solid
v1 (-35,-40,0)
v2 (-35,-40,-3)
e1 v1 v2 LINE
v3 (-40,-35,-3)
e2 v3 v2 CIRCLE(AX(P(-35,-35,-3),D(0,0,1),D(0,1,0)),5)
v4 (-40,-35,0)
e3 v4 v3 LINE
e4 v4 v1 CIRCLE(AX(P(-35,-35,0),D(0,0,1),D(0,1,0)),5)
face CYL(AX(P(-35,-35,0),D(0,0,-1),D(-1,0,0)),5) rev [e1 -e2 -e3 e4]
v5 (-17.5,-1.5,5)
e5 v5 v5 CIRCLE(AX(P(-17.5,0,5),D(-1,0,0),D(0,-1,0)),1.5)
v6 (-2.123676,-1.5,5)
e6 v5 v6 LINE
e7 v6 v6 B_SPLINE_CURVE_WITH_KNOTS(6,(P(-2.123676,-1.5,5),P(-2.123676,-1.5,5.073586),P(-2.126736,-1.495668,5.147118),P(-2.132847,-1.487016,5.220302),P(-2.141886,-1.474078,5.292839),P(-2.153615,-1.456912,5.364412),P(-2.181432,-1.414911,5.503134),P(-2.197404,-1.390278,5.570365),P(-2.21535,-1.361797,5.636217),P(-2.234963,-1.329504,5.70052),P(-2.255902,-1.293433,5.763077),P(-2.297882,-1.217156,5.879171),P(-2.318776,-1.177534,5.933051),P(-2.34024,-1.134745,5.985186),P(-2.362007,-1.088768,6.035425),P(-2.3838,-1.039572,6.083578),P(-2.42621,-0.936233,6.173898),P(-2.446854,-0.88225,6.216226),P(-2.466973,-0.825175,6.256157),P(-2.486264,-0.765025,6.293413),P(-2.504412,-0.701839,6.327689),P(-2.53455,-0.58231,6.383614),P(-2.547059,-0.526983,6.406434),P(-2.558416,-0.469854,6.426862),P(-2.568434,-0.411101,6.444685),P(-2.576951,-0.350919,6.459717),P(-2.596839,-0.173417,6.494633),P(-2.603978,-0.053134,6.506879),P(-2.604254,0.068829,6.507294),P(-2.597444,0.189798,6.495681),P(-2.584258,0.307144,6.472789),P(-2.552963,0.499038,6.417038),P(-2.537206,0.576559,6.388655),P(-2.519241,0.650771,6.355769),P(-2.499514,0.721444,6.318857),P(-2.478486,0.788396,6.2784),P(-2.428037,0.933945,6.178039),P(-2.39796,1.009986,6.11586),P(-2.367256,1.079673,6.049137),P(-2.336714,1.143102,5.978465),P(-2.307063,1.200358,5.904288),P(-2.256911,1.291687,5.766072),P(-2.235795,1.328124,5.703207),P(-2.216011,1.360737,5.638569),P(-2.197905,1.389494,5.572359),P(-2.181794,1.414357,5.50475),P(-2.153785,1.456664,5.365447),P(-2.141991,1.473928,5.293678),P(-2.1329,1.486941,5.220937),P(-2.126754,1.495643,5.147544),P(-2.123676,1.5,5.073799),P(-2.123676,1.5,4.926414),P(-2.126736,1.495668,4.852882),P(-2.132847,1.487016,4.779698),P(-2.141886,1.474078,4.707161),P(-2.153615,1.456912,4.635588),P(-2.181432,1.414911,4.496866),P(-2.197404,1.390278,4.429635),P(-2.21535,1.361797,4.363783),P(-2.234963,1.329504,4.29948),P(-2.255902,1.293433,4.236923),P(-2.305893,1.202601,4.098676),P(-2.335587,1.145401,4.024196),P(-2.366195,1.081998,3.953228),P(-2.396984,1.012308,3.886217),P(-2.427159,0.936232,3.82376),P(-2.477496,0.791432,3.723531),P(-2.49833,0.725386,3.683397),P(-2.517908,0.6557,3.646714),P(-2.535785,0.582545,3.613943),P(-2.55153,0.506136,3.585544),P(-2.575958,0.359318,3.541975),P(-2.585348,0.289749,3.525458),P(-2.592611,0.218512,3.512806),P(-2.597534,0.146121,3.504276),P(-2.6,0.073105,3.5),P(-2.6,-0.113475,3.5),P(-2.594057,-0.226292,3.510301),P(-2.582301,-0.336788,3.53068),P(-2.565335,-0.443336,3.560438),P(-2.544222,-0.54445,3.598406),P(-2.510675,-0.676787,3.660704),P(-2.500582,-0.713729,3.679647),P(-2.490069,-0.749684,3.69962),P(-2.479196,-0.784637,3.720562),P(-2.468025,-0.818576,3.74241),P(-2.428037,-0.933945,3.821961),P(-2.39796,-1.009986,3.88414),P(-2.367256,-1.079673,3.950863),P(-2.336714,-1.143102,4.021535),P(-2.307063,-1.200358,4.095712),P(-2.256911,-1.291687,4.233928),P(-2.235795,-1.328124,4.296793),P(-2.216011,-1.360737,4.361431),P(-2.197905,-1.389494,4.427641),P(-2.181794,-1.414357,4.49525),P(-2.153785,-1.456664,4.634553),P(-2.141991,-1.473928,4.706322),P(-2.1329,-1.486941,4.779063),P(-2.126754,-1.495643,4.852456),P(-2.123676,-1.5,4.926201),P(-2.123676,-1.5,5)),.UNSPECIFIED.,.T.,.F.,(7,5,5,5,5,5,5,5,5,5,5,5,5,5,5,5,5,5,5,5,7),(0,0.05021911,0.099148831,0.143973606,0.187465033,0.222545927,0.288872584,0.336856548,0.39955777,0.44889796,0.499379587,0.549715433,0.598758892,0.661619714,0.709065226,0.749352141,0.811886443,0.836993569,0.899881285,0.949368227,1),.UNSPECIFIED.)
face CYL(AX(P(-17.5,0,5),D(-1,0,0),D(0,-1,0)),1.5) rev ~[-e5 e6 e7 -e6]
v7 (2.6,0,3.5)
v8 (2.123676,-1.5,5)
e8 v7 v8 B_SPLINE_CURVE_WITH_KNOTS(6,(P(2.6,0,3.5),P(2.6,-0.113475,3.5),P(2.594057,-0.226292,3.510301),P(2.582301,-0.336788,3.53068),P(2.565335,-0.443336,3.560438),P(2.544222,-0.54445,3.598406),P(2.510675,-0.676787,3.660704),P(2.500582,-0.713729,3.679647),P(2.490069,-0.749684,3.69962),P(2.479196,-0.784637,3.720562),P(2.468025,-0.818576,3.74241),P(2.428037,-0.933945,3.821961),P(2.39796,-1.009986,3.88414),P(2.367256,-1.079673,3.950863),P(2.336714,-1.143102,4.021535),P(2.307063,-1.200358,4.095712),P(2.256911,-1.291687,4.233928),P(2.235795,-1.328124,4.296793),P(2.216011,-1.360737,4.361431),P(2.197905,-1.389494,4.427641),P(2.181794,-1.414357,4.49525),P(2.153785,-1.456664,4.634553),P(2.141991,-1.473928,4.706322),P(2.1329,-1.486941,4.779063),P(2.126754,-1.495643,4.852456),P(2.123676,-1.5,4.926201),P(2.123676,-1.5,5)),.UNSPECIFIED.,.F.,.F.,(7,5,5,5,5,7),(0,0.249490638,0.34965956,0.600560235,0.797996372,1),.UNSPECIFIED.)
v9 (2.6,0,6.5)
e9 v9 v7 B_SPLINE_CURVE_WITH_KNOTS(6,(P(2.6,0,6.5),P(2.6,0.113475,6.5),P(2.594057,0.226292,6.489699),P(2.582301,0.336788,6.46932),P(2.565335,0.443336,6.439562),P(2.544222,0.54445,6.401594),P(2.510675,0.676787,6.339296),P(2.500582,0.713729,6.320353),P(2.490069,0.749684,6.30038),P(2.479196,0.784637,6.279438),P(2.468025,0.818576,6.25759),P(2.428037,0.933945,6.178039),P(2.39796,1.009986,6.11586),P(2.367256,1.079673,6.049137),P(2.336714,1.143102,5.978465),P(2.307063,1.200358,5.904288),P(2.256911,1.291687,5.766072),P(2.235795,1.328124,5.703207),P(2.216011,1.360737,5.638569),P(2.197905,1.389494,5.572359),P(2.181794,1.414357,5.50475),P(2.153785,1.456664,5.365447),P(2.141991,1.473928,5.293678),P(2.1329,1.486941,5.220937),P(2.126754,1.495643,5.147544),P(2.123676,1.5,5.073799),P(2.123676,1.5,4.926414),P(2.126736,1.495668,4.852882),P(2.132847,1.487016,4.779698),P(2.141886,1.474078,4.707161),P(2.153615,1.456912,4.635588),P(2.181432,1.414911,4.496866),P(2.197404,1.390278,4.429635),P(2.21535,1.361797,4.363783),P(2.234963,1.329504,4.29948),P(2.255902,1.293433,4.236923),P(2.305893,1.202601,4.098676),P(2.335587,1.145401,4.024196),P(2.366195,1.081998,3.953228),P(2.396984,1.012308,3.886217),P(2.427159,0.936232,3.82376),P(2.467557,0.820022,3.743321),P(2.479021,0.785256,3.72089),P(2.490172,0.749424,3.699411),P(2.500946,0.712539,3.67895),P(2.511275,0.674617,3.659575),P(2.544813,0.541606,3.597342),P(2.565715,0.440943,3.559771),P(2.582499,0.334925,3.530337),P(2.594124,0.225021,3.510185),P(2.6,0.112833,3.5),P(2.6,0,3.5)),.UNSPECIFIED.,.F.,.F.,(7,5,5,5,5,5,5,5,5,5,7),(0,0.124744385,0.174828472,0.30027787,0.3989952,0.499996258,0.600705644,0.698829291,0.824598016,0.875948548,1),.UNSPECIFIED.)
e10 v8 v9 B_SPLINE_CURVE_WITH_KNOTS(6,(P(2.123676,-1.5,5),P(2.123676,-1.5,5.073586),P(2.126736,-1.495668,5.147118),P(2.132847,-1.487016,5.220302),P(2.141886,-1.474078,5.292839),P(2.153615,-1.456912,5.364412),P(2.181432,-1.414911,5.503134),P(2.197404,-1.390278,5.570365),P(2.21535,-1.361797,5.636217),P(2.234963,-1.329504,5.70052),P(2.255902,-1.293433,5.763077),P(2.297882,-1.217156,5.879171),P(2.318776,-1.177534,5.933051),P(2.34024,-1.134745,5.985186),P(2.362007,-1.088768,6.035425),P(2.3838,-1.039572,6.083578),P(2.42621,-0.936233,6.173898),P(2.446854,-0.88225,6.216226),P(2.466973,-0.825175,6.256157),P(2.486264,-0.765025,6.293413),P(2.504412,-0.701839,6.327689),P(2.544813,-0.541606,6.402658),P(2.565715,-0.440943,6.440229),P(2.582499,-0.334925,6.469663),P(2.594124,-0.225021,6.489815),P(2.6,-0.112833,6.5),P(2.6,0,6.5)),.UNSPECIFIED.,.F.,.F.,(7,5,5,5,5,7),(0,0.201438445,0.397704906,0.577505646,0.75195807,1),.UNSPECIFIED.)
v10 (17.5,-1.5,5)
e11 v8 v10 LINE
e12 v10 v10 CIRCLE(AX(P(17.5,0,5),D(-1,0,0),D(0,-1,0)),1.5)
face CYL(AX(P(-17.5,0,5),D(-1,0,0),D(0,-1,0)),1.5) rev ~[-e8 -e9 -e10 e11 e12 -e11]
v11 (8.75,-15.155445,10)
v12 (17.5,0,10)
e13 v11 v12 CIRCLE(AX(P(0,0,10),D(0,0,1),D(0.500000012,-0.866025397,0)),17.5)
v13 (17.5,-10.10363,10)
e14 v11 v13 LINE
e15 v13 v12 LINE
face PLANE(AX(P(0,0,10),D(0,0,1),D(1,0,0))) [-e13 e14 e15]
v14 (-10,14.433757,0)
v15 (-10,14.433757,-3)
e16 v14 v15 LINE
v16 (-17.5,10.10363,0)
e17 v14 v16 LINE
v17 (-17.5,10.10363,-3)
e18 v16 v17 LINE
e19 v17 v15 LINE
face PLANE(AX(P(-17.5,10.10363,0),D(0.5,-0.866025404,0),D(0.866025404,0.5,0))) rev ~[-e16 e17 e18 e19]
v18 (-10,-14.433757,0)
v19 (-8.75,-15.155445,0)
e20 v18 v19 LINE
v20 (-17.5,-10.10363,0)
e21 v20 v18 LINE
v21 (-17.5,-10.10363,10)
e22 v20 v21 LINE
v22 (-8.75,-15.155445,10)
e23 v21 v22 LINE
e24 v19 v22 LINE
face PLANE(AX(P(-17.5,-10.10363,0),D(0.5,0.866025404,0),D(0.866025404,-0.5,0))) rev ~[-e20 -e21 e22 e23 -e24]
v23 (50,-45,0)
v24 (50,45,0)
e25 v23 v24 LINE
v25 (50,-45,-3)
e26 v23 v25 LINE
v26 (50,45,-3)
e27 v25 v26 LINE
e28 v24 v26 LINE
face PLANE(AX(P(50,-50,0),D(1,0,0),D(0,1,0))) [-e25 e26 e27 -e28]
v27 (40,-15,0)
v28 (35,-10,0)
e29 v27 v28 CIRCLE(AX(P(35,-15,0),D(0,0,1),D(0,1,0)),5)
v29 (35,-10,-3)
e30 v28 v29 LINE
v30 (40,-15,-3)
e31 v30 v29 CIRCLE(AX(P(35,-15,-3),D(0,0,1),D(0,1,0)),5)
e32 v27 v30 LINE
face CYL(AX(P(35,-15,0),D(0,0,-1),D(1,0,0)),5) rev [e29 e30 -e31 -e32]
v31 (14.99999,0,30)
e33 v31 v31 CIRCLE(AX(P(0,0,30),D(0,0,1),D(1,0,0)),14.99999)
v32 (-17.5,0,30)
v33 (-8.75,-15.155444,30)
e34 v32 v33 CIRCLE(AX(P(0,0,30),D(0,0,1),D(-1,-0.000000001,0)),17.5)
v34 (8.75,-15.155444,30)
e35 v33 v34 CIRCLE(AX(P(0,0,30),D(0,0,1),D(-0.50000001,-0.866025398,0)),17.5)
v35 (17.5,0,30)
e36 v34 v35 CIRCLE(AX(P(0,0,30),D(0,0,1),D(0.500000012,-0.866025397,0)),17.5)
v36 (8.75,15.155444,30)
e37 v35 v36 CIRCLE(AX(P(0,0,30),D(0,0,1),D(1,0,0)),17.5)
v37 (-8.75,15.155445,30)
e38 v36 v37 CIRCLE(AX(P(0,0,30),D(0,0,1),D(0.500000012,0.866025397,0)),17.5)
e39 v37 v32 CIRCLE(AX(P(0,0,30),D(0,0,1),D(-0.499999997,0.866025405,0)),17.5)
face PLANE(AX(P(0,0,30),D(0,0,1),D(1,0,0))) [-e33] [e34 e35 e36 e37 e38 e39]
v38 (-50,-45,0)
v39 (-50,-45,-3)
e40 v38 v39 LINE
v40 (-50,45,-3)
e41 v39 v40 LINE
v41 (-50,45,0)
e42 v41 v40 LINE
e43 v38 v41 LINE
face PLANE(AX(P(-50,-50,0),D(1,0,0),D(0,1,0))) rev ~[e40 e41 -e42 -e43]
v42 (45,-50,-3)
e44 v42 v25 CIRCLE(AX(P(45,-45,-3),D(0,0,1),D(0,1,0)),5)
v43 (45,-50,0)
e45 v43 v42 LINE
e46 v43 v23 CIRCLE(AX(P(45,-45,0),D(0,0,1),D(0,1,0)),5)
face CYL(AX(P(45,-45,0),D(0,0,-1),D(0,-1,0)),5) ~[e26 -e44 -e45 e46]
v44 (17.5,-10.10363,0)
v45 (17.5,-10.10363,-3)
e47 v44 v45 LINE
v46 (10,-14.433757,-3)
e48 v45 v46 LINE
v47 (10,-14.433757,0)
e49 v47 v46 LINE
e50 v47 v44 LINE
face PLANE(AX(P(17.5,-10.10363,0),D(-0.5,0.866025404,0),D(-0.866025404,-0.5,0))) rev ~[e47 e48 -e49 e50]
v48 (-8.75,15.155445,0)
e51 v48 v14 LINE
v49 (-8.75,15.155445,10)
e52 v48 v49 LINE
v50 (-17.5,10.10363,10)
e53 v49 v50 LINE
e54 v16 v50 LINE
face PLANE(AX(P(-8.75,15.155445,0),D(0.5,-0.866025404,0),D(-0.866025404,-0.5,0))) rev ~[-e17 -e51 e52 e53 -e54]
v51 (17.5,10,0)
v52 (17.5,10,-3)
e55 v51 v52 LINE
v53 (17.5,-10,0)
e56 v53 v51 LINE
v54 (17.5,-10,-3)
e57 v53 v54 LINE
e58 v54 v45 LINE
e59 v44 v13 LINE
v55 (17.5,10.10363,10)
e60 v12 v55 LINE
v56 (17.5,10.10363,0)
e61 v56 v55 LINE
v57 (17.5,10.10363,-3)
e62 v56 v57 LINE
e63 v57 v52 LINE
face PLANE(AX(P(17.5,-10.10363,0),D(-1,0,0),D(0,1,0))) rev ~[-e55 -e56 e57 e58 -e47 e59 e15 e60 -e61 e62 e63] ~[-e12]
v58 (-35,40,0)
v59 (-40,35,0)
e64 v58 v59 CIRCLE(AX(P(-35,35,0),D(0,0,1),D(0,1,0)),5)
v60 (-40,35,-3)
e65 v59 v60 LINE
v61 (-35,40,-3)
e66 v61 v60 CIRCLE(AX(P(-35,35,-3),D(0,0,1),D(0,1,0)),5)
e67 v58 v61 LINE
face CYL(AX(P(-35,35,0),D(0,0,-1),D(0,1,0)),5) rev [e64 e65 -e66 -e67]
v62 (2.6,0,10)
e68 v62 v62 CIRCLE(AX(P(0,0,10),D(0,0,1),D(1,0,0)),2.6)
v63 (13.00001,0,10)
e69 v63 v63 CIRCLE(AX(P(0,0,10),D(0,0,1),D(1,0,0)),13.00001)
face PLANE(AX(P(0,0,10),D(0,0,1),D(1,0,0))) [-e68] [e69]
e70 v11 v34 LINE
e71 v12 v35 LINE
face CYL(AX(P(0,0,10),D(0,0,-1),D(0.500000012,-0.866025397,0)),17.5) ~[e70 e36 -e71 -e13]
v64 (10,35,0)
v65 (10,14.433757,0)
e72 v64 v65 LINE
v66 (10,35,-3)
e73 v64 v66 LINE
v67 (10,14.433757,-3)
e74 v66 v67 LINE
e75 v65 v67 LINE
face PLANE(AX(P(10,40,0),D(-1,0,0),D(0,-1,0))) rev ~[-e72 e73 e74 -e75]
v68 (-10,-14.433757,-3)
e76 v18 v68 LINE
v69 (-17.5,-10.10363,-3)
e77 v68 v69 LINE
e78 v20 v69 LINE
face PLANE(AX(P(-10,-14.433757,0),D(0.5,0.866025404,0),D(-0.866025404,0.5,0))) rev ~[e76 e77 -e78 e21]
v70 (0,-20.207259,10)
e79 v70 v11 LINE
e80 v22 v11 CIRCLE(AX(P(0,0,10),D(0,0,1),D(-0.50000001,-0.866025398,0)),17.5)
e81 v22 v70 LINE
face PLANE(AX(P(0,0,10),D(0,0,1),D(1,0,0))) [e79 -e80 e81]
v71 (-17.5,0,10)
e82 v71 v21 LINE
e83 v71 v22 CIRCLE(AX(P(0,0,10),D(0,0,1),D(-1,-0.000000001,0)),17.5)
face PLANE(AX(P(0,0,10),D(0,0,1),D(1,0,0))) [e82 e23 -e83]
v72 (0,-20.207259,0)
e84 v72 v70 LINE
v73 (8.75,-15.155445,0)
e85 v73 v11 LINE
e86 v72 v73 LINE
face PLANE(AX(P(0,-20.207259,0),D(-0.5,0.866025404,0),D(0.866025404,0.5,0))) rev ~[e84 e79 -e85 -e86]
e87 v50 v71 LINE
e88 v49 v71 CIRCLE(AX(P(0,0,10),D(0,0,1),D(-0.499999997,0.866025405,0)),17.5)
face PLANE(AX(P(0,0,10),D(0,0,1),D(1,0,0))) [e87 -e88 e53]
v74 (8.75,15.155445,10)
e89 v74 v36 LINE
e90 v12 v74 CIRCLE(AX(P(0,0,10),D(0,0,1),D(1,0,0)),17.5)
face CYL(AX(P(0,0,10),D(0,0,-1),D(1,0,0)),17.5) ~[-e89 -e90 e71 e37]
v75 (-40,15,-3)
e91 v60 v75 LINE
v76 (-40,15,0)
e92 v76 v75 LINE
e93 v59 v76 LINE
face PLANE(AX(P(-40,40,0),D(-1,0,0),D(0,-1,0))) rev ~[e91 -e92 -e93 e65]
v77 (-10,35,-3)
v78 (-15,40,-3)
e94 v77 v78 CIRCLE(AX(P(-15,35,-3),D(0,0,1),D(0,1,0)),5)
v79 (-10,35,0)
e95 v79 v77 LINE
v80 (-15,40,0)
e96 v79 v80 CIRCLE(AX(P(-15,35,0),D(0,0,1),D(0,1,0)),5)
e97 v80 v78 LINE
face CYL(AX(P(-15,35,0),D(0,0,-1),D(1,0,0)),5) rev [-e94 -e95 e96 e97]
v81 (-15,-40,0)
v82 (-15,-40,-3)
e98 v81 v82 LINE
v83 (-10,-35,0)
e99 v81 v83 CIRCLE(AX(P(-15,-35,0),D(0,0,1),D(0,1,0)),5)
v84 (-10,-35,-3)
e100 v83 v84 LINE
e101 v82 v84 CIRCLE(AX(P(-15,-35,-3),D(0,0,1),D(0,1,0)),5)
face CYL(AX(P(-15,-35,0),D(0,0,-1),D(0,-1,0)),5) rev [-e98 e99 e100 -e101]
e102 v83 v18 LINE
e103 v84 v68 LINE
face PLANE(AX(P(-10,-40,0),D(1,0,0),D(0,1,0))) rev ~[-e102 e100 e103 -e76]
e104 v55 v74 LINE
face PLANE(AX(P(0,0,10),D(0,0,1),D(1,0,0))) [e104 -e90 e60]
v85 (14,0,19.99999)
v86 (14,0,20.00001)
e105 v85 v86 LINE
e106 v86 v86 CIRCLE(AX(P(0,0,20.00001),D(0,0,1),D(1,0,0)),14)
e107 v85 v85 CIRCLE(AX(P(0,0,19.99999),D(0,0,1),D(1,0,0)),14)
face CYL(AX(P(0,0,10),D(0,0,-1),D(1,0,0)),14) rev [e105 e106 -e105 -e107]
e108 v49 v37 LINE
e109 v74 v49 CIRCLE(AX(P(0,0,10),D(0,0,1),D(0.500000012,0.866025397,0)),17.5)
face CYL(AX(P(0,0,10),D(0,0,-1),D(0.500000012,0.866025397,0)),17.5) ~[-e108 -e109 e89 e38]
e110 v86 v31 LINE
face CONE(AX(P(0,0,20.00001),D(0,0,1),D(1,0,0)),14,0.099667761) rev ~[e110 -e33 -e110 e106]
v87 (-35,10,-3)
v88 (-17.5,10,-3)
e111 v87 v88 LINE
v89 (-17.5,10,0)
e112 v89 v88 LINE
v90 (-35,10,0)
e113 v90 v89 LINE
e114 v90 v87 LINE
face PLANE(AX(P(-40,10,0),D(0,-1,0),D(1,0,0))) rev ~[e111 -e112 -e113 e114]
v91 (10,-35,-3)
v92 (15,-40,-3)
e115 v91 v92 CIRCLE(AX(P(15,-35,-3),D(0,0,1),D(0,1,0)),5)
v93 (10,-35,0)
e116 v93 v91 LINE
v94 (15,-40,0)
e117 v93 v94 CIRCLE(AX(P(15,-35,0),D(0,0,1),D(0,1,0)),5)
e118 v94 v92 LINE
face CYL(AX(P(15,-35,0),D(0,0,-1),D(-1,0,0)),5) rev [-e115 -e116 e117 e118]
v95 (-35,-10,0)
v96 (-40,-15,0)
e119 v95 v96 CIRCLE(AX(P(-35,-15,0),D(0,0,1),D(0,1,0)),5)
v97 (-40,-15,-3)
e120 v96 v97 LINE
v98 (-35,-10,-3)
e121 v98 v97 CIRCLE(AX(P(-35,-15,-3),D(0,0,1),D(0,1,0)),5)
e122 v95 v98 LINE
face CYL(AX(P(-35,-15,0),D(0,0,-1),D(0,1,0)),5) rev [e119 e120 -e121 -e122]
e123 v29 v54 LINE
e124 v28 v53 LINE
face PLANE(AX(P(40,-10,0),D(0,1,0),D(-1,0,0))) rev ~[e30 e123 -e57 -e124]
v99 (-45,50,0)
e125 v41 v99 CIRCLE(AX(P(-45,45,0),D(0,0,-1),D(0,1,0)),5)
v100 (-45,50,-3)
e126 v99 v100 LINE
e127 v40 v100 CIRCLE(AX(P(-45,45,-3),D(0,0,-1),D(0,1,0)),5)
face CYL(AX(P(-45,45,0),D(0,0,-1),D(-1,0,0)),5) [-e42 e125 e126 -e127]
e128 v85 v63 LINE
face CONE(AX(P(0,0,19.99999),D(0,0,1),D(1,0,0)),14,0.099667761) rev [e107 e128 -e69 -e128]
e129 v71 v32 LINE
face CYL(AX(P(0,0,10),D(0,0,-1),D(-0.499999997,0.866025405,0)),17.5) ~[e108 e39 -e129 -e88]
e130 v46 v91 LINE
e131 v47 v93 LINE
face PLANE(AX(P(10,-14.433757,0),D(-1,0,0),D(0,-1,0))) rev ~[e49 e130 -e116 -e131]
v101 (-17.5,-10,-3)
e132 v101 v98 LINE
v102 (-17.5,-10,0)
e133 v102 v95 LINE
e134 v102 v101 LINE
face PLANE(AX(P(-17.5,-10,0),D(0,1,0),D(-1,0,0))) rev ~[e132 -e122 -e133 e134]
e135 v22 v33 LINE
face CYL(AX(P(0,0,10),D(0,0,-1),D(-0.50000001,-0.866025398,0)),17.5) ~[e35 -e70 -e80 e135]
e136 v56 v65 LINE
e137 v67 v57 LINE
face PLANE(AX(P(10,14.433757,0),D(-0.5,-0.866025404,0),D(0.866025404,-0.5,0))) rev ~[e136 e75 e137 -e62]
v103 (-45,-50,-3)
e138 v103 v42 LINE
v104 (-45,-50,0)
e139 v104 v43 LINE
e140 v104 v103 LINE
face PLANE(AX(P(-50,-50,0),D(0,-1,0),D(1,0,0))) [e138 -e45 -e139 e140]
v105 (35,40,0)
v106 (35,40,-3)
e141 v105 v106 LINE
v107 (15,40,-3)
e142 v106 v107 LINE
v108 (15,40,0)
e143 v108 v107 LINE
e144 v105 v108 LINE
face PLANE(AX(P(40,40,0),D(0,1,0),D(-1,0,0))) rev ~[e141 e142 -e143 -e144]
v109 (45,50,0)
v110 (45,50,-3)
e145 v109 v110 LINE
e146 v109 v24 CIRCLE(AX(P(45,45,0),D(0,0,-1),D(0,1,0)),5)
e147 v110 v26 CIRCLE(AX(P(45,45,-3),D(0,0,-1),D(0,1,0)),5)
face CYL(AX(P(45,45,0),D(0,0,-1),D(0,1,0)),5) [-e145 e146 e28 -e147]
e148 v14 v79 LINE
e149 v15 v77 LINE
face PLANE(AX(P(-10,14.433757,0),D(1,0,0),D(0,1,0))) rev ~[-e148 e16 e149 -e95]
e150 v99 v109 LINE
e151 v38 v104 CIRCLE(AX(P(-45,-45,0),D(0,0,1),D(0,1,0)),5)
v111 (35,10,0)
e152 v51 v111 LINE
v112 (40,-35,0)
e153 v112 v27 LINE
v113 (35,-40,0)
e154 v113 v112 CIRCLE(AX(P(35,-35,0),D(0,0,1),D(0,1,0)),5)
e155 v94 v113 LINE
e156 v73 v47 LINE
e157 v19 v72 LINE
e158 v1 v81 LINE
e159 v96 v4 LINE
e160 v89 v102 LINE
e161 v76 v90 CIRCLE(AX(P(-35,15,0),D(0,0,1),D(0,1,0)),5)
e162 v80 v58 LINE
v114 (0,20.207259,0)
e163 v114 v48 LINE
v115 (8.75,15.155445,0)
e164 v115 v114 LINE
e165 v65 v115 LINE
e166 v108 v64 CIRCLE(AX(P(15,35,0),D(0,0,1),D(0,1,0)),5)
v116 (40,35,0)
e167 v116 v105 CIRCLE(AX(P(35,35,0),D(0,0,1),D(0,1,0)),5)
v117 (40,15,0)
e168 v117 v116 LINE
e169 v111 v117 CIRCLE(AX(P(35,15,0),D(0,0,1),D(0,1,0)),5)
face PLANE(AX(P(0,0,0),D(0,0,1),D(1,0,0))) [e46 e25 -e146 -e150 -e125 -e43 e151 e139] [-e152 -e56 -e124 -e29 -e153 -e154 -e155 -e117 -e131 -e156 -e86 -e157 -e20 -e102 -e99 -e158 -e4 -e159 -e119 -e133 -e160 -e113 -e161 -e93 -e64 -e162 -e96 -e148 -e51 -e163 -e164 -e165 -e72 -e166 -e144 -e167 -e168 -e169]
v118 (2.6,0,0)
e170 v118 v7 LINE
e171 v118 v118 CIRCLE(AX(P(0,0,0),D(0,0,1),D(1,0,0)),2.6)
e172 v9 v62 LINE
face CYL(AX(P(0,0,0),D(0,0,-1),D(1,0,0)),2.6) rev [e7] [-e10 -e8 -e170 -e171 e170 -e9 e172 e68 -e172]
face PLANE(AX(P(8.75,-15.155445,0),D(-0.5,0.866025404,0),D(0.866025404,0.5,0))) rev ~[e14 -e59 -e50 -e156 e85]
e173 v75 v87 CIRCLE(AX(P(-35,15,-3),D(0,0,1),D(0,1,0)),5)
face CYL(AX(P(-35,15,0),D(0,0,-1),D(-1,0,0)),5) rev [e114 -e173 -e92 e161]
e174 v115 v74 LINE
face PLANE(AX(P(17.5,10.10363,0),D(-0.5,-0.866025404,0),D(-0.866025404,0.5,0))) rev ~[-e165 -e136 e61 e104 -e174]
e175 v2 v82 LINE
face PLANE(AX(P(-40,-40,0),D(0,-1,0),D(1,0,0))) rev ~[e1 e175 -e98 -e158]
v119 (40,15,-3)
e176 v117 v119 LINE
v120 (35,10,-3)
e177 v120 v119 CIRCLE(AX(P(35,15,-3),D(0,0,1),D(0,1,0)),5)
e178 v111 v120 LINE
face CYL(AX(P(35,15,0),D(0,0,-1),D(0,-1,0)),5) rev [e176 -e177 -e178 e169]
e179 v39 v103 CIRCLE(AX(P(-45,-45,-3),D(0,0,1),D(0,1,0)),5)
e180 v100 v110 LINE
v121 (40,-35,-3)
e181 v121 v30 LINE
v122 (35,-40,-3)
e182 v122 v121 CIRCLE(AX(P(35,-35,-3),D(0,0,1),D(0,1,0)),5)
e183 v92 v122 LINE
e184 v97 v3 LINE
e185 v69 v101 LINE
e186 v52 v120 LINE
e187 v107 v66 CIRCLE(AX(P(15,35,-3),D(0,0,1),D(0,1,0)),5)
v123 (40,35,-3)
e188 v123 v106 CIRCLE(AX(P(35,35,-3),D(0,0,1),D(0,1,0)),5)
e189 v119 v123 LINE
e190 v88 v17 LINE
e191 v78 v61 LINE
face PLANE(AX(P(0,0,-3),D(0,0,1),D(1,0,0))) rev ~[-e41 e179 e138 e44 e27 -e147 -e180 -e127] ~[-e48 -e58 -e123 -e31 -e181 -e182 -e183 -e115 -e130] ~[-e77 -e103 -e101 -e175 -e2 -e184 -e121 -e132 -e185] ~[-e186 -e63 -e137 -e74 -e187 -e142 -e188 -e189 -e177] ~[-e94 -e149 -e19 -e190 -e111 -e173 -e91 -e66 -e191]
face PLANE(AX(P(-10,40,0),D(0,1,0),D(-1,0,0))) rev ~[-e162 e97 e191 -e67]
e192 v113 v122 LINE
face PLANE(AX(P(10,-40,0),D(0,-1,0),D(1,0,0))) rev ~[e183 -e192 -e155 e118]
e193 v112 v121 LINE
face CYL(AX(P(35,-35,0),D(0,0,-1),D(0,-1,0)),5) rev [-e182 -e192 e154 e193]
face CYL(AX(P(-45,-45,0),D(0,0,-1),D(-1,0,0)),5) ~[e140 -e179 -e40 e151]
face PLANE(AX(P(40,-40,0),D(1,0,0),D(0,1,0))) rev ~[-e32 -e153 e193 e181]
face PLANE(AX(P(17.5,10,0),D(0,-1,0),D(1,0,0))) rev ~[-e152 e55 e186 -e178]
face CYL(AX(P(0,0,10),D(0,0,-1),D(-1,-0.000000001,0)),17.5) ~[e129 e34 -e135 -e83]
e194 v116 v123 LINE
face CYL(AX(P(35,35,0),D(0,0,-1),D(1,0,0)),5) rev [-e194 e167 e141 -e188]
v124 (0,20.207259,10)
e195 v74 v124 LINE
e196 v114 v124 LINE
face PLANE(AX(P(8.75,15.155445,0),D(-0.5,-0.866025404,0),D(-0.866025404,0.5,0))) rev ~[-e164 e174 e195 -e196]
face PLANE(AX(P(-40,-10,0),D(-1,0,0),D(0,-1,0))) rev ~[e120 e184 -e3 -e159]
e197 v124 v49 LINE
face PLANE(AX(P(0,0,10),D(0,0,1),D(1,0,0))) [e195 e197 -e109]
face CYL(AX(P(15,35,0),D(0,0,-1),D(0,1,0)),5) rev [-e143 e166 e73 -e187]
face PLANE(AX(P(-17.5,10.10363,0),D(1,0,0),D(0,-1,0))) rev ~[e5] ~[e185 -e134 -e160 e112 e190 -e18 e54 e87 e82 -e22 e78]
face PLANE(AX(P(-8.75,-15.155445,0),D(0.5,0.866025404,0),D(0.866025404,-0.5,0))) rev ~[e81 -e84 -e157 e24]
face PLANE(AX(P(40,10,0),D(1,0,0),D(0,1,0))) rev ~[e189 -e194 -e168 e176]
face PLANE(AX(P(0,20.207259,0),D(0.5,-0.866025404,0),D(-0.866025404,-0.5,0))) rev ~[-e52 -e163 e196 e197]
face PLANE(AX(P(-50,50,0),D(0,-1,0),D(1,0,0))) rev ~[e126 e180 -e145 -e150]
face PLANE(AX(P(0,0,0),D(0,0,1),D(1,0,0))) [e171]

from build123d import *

# Parameters (mm, degrees)
F0_R      = 2.6
F1_DEPTH  = 10
F2_R      = 14
F3_DEPTH  = 20
F4_R      = 1.5
F5_DEPTH  = 35.001
F6_SIZE2  = 0.99999
F6_SIZE   = 9.99999
F7_W      = 100
F7_H      = 100
F8_DEPTH  = 3
F10_DEPTH = 25
F11_R     = 5


# Not quite as in the source:
# - a fillet or chamfer is up to 0.001 mm smaller than in the source, because OpenCascade refuses the exact size


with BuildPart() as f1:
    # F0 (on Top) → F1 (new body)
    with BuildSketch(Plane.XY):
        with BuildLine():
            ThreePointArc((8.7499999554, -15.155444592), (15.1554445533, -8.7500000223), (17.5, 0))
            ThreePointArc((17.5, 0), (15.15544445, 8.7500002013), (8.7499995974, 15.1554447987))
            ThreePointArc((8.7499995974, 15.1554447987), (-2.067e-07, 17.5), (-8.7499999554, 15.155444592))
            ThreePointArc((-8.7499999554, 15.155444592), (-15.155444558, 8.7500000142), (-17.5, -1.86e-08))
            ThreePointArc((-17.5, -1.86e-08), (-15.1554444739, -8.7500001599), (-8.7499996963, -15.1554447416))
            ThreePointArc((-8.7499996963, -15.1554447416), (1.496e-07, -17.5), (8.7499999554, -15.155444592))
        make_face()
        Circle(F0_R, mode=Mode.SUBTRACT)
        with BuildLine():
            Line((-17.5, -10.1036297108), (-8.7499996963, -15.1554447416))
            ThreePointArc((-8.7499996963, -15.1554447416), (-15.1554444739, -8.7500001599), (-17.5, -1.86e-08))
            Line((-17.5, -1.86e-08), (-17.5, -10.1036297108))
        make_face()
        with BuildLine():
            Line((0, -20.2072594216), (8.7499999554, -15.155444592))
            ThreePointArc((8.7499999554, -15.155444592), (1.496e-07, -17.5), (-8.7499996963, -15.1554447416))
            Line((-8.7499996963, -15.1554447416), (0, -20.2072594216))
        make_face()
        with BuildLine():
            Line((17.5, -10.1036297108), (17.5, 0))
            ThreePointArc((17.5, 0), (15.1554445533, -8.7500000223), (8.7499999554, -15.155444592))
            Line((8.7499999554, -15.155444592), (17.5, -10.1036297108))
        make_face()
        with BuildLine():
            ThreePointArc((8.7499995974, 15.1554447987), (15.15544445, 8.7500002013), (17.5, 0))
            Line((17.5, 0), (17.5, 10.1036297108))
            Line((17.5, 10.1036297108), (8.7499995974, 15.1554447987))
        make_face()
        with BuildLine():
            ThreePointArc((-8.7499999554, 15.155444592), (-2.067e-07, 17.5), (8.7499995974, 15.1554447987))
            Line((8.7499995974, 15.1554447987), (0, 20.2072594216))
            Line((0, 20.2072594216), (-8.7499999554, 15.155444592))
        make_face()
        with BuildLine():
            ThreePointArc((-17.5, -1.86e-08), (-15.155444558, 8.7500000142), (-8.7499999554, 15.155444592))
            Line((-8.7499999554, 15.155444592), (-17.5, 10.1036297108))
            Line((-17.5, 10.1036297108), (-17.5, -1.86e-08))
        make_face()
    extrude(amount=F1_DEPTH)

    # F2 (on face) → F3 (join)
    with BuildSketch(Plane.XY.offset(10)):
        with BuildLine():
            ThreePointArc((8.7500002145, -15.1554444424), (15.1554446281, -8.7499998928), (17.5, 0))
            ThreePointArc((17.5, 0), (15.1554446281, 8.7499998928), (8.7500002145, 15.1554444424))
            ThreePointArc((8.7500002145, 15.1554444424), (1.496e-07, 17.5), (-8.7499999554, 15.155444592))
            ThreePointArc((-8.7499999554, 15.155444592), (-15.155444558, 8.7500000142), (-17.5, -1.86e-08))
            ThreePointArc((-17.5, -1.86e-08), (-15.1554446126, -8.7499999197), (-8.7500001767, -15.1554444642))
            ThreePointArc((-8.7500001767, -15.1554444642), (2.18e-08, -17.5), (8.7500002145, -15.1554444424))
        make_face()
        Circle(F2_R, mode=Mode.SUBTRACT)
    extrude(amount=F3_DEPTH)

    # F4 (on face) → F5 (cut, through all)
    with BuildSketch(Plane(origin=(-17.5, 0, 0), x_dir=(0, -1, 0), z_dir=(-1, 0, 0))):
        with Locations((0, 5)):
            Circle(F4_R)
    extrude(amount=-F5_DEPTH, mode=Mode.SUBTRACT)

    # F6 (size 10 and 1 in the source; OpenCascade refuses exactly that, so slightly less here)
    f6_edges = [f1.edges().sort_by_distance(p)[0] for p in [
        (14, 0, 20),
        (-14, 0, 10),
        (-14, 0, 30),
    ]]
    f6_side = f1.faces().sort_by_distance((-14, 0, 20))[0]
    chamfer(f6_edges, length=F6_SIZE, length2=F6_SIZE2, reference=f6_side)

    # F7 (on Top) → F8 (join)
    with BuildSketch(Plane.XY):
        Rectangle(F7_W, F7_H)
    extrude(amount=-F8_DEPTH)

    # F9 (on face) → F10 (cut)
    with BuildSketch(Plane.XY):
        Polygon((-40, 40), (-40, 10), (-17.5, 10), (-17.5, 10.1036297108), (-10, 14.4337567297), (-10, 40), align=None)
        Polygon((17.5, 10), (40, 10), (40, 40), (10, 40), (10, 14.4337567297), (17.5, 10.1036297108), align=None)
        Polygon((10, -14.4337567297), (10, -40), (40, -40), (40, -10), (17.5, -10), (17.5, -10.1036297108), align=None)
        Polygon((-40, -10), (-40, -40), (-10, -40), (-10, -14.4337567297), (-17.5, -10.1036297108), (-17.5, -10), align=None)
    extrude(amount=-F10_DEPTH, mode=Mode.SUBTRACT)

    # F11
    f11_edges = [f1.edges().sort_by_distance(p)[0] for p in [
        (-40, 40, -1.5),
        (-10, 40, -1.5),
        (-40, 10, -1.5),
        (10, 40, -1.5),
        (40, 40, -1.5),
        (40, 10, -1.5),
        (40, -10, -1.5),
        (10, -40, -1.5),
        (40, -40, -1.5),
        (-10, -40, -1.5),
        (-40, -40, -1.5),
        (-40, -10, -1.5),
        (50, -50, -1.5),
        (-50, -50, -1.5),
        (-50, 50, -1.5),
        (50, 50, -1.5),
    ]]
    fillet(f11_edges, radius=F11_R)


solid = f1.part
